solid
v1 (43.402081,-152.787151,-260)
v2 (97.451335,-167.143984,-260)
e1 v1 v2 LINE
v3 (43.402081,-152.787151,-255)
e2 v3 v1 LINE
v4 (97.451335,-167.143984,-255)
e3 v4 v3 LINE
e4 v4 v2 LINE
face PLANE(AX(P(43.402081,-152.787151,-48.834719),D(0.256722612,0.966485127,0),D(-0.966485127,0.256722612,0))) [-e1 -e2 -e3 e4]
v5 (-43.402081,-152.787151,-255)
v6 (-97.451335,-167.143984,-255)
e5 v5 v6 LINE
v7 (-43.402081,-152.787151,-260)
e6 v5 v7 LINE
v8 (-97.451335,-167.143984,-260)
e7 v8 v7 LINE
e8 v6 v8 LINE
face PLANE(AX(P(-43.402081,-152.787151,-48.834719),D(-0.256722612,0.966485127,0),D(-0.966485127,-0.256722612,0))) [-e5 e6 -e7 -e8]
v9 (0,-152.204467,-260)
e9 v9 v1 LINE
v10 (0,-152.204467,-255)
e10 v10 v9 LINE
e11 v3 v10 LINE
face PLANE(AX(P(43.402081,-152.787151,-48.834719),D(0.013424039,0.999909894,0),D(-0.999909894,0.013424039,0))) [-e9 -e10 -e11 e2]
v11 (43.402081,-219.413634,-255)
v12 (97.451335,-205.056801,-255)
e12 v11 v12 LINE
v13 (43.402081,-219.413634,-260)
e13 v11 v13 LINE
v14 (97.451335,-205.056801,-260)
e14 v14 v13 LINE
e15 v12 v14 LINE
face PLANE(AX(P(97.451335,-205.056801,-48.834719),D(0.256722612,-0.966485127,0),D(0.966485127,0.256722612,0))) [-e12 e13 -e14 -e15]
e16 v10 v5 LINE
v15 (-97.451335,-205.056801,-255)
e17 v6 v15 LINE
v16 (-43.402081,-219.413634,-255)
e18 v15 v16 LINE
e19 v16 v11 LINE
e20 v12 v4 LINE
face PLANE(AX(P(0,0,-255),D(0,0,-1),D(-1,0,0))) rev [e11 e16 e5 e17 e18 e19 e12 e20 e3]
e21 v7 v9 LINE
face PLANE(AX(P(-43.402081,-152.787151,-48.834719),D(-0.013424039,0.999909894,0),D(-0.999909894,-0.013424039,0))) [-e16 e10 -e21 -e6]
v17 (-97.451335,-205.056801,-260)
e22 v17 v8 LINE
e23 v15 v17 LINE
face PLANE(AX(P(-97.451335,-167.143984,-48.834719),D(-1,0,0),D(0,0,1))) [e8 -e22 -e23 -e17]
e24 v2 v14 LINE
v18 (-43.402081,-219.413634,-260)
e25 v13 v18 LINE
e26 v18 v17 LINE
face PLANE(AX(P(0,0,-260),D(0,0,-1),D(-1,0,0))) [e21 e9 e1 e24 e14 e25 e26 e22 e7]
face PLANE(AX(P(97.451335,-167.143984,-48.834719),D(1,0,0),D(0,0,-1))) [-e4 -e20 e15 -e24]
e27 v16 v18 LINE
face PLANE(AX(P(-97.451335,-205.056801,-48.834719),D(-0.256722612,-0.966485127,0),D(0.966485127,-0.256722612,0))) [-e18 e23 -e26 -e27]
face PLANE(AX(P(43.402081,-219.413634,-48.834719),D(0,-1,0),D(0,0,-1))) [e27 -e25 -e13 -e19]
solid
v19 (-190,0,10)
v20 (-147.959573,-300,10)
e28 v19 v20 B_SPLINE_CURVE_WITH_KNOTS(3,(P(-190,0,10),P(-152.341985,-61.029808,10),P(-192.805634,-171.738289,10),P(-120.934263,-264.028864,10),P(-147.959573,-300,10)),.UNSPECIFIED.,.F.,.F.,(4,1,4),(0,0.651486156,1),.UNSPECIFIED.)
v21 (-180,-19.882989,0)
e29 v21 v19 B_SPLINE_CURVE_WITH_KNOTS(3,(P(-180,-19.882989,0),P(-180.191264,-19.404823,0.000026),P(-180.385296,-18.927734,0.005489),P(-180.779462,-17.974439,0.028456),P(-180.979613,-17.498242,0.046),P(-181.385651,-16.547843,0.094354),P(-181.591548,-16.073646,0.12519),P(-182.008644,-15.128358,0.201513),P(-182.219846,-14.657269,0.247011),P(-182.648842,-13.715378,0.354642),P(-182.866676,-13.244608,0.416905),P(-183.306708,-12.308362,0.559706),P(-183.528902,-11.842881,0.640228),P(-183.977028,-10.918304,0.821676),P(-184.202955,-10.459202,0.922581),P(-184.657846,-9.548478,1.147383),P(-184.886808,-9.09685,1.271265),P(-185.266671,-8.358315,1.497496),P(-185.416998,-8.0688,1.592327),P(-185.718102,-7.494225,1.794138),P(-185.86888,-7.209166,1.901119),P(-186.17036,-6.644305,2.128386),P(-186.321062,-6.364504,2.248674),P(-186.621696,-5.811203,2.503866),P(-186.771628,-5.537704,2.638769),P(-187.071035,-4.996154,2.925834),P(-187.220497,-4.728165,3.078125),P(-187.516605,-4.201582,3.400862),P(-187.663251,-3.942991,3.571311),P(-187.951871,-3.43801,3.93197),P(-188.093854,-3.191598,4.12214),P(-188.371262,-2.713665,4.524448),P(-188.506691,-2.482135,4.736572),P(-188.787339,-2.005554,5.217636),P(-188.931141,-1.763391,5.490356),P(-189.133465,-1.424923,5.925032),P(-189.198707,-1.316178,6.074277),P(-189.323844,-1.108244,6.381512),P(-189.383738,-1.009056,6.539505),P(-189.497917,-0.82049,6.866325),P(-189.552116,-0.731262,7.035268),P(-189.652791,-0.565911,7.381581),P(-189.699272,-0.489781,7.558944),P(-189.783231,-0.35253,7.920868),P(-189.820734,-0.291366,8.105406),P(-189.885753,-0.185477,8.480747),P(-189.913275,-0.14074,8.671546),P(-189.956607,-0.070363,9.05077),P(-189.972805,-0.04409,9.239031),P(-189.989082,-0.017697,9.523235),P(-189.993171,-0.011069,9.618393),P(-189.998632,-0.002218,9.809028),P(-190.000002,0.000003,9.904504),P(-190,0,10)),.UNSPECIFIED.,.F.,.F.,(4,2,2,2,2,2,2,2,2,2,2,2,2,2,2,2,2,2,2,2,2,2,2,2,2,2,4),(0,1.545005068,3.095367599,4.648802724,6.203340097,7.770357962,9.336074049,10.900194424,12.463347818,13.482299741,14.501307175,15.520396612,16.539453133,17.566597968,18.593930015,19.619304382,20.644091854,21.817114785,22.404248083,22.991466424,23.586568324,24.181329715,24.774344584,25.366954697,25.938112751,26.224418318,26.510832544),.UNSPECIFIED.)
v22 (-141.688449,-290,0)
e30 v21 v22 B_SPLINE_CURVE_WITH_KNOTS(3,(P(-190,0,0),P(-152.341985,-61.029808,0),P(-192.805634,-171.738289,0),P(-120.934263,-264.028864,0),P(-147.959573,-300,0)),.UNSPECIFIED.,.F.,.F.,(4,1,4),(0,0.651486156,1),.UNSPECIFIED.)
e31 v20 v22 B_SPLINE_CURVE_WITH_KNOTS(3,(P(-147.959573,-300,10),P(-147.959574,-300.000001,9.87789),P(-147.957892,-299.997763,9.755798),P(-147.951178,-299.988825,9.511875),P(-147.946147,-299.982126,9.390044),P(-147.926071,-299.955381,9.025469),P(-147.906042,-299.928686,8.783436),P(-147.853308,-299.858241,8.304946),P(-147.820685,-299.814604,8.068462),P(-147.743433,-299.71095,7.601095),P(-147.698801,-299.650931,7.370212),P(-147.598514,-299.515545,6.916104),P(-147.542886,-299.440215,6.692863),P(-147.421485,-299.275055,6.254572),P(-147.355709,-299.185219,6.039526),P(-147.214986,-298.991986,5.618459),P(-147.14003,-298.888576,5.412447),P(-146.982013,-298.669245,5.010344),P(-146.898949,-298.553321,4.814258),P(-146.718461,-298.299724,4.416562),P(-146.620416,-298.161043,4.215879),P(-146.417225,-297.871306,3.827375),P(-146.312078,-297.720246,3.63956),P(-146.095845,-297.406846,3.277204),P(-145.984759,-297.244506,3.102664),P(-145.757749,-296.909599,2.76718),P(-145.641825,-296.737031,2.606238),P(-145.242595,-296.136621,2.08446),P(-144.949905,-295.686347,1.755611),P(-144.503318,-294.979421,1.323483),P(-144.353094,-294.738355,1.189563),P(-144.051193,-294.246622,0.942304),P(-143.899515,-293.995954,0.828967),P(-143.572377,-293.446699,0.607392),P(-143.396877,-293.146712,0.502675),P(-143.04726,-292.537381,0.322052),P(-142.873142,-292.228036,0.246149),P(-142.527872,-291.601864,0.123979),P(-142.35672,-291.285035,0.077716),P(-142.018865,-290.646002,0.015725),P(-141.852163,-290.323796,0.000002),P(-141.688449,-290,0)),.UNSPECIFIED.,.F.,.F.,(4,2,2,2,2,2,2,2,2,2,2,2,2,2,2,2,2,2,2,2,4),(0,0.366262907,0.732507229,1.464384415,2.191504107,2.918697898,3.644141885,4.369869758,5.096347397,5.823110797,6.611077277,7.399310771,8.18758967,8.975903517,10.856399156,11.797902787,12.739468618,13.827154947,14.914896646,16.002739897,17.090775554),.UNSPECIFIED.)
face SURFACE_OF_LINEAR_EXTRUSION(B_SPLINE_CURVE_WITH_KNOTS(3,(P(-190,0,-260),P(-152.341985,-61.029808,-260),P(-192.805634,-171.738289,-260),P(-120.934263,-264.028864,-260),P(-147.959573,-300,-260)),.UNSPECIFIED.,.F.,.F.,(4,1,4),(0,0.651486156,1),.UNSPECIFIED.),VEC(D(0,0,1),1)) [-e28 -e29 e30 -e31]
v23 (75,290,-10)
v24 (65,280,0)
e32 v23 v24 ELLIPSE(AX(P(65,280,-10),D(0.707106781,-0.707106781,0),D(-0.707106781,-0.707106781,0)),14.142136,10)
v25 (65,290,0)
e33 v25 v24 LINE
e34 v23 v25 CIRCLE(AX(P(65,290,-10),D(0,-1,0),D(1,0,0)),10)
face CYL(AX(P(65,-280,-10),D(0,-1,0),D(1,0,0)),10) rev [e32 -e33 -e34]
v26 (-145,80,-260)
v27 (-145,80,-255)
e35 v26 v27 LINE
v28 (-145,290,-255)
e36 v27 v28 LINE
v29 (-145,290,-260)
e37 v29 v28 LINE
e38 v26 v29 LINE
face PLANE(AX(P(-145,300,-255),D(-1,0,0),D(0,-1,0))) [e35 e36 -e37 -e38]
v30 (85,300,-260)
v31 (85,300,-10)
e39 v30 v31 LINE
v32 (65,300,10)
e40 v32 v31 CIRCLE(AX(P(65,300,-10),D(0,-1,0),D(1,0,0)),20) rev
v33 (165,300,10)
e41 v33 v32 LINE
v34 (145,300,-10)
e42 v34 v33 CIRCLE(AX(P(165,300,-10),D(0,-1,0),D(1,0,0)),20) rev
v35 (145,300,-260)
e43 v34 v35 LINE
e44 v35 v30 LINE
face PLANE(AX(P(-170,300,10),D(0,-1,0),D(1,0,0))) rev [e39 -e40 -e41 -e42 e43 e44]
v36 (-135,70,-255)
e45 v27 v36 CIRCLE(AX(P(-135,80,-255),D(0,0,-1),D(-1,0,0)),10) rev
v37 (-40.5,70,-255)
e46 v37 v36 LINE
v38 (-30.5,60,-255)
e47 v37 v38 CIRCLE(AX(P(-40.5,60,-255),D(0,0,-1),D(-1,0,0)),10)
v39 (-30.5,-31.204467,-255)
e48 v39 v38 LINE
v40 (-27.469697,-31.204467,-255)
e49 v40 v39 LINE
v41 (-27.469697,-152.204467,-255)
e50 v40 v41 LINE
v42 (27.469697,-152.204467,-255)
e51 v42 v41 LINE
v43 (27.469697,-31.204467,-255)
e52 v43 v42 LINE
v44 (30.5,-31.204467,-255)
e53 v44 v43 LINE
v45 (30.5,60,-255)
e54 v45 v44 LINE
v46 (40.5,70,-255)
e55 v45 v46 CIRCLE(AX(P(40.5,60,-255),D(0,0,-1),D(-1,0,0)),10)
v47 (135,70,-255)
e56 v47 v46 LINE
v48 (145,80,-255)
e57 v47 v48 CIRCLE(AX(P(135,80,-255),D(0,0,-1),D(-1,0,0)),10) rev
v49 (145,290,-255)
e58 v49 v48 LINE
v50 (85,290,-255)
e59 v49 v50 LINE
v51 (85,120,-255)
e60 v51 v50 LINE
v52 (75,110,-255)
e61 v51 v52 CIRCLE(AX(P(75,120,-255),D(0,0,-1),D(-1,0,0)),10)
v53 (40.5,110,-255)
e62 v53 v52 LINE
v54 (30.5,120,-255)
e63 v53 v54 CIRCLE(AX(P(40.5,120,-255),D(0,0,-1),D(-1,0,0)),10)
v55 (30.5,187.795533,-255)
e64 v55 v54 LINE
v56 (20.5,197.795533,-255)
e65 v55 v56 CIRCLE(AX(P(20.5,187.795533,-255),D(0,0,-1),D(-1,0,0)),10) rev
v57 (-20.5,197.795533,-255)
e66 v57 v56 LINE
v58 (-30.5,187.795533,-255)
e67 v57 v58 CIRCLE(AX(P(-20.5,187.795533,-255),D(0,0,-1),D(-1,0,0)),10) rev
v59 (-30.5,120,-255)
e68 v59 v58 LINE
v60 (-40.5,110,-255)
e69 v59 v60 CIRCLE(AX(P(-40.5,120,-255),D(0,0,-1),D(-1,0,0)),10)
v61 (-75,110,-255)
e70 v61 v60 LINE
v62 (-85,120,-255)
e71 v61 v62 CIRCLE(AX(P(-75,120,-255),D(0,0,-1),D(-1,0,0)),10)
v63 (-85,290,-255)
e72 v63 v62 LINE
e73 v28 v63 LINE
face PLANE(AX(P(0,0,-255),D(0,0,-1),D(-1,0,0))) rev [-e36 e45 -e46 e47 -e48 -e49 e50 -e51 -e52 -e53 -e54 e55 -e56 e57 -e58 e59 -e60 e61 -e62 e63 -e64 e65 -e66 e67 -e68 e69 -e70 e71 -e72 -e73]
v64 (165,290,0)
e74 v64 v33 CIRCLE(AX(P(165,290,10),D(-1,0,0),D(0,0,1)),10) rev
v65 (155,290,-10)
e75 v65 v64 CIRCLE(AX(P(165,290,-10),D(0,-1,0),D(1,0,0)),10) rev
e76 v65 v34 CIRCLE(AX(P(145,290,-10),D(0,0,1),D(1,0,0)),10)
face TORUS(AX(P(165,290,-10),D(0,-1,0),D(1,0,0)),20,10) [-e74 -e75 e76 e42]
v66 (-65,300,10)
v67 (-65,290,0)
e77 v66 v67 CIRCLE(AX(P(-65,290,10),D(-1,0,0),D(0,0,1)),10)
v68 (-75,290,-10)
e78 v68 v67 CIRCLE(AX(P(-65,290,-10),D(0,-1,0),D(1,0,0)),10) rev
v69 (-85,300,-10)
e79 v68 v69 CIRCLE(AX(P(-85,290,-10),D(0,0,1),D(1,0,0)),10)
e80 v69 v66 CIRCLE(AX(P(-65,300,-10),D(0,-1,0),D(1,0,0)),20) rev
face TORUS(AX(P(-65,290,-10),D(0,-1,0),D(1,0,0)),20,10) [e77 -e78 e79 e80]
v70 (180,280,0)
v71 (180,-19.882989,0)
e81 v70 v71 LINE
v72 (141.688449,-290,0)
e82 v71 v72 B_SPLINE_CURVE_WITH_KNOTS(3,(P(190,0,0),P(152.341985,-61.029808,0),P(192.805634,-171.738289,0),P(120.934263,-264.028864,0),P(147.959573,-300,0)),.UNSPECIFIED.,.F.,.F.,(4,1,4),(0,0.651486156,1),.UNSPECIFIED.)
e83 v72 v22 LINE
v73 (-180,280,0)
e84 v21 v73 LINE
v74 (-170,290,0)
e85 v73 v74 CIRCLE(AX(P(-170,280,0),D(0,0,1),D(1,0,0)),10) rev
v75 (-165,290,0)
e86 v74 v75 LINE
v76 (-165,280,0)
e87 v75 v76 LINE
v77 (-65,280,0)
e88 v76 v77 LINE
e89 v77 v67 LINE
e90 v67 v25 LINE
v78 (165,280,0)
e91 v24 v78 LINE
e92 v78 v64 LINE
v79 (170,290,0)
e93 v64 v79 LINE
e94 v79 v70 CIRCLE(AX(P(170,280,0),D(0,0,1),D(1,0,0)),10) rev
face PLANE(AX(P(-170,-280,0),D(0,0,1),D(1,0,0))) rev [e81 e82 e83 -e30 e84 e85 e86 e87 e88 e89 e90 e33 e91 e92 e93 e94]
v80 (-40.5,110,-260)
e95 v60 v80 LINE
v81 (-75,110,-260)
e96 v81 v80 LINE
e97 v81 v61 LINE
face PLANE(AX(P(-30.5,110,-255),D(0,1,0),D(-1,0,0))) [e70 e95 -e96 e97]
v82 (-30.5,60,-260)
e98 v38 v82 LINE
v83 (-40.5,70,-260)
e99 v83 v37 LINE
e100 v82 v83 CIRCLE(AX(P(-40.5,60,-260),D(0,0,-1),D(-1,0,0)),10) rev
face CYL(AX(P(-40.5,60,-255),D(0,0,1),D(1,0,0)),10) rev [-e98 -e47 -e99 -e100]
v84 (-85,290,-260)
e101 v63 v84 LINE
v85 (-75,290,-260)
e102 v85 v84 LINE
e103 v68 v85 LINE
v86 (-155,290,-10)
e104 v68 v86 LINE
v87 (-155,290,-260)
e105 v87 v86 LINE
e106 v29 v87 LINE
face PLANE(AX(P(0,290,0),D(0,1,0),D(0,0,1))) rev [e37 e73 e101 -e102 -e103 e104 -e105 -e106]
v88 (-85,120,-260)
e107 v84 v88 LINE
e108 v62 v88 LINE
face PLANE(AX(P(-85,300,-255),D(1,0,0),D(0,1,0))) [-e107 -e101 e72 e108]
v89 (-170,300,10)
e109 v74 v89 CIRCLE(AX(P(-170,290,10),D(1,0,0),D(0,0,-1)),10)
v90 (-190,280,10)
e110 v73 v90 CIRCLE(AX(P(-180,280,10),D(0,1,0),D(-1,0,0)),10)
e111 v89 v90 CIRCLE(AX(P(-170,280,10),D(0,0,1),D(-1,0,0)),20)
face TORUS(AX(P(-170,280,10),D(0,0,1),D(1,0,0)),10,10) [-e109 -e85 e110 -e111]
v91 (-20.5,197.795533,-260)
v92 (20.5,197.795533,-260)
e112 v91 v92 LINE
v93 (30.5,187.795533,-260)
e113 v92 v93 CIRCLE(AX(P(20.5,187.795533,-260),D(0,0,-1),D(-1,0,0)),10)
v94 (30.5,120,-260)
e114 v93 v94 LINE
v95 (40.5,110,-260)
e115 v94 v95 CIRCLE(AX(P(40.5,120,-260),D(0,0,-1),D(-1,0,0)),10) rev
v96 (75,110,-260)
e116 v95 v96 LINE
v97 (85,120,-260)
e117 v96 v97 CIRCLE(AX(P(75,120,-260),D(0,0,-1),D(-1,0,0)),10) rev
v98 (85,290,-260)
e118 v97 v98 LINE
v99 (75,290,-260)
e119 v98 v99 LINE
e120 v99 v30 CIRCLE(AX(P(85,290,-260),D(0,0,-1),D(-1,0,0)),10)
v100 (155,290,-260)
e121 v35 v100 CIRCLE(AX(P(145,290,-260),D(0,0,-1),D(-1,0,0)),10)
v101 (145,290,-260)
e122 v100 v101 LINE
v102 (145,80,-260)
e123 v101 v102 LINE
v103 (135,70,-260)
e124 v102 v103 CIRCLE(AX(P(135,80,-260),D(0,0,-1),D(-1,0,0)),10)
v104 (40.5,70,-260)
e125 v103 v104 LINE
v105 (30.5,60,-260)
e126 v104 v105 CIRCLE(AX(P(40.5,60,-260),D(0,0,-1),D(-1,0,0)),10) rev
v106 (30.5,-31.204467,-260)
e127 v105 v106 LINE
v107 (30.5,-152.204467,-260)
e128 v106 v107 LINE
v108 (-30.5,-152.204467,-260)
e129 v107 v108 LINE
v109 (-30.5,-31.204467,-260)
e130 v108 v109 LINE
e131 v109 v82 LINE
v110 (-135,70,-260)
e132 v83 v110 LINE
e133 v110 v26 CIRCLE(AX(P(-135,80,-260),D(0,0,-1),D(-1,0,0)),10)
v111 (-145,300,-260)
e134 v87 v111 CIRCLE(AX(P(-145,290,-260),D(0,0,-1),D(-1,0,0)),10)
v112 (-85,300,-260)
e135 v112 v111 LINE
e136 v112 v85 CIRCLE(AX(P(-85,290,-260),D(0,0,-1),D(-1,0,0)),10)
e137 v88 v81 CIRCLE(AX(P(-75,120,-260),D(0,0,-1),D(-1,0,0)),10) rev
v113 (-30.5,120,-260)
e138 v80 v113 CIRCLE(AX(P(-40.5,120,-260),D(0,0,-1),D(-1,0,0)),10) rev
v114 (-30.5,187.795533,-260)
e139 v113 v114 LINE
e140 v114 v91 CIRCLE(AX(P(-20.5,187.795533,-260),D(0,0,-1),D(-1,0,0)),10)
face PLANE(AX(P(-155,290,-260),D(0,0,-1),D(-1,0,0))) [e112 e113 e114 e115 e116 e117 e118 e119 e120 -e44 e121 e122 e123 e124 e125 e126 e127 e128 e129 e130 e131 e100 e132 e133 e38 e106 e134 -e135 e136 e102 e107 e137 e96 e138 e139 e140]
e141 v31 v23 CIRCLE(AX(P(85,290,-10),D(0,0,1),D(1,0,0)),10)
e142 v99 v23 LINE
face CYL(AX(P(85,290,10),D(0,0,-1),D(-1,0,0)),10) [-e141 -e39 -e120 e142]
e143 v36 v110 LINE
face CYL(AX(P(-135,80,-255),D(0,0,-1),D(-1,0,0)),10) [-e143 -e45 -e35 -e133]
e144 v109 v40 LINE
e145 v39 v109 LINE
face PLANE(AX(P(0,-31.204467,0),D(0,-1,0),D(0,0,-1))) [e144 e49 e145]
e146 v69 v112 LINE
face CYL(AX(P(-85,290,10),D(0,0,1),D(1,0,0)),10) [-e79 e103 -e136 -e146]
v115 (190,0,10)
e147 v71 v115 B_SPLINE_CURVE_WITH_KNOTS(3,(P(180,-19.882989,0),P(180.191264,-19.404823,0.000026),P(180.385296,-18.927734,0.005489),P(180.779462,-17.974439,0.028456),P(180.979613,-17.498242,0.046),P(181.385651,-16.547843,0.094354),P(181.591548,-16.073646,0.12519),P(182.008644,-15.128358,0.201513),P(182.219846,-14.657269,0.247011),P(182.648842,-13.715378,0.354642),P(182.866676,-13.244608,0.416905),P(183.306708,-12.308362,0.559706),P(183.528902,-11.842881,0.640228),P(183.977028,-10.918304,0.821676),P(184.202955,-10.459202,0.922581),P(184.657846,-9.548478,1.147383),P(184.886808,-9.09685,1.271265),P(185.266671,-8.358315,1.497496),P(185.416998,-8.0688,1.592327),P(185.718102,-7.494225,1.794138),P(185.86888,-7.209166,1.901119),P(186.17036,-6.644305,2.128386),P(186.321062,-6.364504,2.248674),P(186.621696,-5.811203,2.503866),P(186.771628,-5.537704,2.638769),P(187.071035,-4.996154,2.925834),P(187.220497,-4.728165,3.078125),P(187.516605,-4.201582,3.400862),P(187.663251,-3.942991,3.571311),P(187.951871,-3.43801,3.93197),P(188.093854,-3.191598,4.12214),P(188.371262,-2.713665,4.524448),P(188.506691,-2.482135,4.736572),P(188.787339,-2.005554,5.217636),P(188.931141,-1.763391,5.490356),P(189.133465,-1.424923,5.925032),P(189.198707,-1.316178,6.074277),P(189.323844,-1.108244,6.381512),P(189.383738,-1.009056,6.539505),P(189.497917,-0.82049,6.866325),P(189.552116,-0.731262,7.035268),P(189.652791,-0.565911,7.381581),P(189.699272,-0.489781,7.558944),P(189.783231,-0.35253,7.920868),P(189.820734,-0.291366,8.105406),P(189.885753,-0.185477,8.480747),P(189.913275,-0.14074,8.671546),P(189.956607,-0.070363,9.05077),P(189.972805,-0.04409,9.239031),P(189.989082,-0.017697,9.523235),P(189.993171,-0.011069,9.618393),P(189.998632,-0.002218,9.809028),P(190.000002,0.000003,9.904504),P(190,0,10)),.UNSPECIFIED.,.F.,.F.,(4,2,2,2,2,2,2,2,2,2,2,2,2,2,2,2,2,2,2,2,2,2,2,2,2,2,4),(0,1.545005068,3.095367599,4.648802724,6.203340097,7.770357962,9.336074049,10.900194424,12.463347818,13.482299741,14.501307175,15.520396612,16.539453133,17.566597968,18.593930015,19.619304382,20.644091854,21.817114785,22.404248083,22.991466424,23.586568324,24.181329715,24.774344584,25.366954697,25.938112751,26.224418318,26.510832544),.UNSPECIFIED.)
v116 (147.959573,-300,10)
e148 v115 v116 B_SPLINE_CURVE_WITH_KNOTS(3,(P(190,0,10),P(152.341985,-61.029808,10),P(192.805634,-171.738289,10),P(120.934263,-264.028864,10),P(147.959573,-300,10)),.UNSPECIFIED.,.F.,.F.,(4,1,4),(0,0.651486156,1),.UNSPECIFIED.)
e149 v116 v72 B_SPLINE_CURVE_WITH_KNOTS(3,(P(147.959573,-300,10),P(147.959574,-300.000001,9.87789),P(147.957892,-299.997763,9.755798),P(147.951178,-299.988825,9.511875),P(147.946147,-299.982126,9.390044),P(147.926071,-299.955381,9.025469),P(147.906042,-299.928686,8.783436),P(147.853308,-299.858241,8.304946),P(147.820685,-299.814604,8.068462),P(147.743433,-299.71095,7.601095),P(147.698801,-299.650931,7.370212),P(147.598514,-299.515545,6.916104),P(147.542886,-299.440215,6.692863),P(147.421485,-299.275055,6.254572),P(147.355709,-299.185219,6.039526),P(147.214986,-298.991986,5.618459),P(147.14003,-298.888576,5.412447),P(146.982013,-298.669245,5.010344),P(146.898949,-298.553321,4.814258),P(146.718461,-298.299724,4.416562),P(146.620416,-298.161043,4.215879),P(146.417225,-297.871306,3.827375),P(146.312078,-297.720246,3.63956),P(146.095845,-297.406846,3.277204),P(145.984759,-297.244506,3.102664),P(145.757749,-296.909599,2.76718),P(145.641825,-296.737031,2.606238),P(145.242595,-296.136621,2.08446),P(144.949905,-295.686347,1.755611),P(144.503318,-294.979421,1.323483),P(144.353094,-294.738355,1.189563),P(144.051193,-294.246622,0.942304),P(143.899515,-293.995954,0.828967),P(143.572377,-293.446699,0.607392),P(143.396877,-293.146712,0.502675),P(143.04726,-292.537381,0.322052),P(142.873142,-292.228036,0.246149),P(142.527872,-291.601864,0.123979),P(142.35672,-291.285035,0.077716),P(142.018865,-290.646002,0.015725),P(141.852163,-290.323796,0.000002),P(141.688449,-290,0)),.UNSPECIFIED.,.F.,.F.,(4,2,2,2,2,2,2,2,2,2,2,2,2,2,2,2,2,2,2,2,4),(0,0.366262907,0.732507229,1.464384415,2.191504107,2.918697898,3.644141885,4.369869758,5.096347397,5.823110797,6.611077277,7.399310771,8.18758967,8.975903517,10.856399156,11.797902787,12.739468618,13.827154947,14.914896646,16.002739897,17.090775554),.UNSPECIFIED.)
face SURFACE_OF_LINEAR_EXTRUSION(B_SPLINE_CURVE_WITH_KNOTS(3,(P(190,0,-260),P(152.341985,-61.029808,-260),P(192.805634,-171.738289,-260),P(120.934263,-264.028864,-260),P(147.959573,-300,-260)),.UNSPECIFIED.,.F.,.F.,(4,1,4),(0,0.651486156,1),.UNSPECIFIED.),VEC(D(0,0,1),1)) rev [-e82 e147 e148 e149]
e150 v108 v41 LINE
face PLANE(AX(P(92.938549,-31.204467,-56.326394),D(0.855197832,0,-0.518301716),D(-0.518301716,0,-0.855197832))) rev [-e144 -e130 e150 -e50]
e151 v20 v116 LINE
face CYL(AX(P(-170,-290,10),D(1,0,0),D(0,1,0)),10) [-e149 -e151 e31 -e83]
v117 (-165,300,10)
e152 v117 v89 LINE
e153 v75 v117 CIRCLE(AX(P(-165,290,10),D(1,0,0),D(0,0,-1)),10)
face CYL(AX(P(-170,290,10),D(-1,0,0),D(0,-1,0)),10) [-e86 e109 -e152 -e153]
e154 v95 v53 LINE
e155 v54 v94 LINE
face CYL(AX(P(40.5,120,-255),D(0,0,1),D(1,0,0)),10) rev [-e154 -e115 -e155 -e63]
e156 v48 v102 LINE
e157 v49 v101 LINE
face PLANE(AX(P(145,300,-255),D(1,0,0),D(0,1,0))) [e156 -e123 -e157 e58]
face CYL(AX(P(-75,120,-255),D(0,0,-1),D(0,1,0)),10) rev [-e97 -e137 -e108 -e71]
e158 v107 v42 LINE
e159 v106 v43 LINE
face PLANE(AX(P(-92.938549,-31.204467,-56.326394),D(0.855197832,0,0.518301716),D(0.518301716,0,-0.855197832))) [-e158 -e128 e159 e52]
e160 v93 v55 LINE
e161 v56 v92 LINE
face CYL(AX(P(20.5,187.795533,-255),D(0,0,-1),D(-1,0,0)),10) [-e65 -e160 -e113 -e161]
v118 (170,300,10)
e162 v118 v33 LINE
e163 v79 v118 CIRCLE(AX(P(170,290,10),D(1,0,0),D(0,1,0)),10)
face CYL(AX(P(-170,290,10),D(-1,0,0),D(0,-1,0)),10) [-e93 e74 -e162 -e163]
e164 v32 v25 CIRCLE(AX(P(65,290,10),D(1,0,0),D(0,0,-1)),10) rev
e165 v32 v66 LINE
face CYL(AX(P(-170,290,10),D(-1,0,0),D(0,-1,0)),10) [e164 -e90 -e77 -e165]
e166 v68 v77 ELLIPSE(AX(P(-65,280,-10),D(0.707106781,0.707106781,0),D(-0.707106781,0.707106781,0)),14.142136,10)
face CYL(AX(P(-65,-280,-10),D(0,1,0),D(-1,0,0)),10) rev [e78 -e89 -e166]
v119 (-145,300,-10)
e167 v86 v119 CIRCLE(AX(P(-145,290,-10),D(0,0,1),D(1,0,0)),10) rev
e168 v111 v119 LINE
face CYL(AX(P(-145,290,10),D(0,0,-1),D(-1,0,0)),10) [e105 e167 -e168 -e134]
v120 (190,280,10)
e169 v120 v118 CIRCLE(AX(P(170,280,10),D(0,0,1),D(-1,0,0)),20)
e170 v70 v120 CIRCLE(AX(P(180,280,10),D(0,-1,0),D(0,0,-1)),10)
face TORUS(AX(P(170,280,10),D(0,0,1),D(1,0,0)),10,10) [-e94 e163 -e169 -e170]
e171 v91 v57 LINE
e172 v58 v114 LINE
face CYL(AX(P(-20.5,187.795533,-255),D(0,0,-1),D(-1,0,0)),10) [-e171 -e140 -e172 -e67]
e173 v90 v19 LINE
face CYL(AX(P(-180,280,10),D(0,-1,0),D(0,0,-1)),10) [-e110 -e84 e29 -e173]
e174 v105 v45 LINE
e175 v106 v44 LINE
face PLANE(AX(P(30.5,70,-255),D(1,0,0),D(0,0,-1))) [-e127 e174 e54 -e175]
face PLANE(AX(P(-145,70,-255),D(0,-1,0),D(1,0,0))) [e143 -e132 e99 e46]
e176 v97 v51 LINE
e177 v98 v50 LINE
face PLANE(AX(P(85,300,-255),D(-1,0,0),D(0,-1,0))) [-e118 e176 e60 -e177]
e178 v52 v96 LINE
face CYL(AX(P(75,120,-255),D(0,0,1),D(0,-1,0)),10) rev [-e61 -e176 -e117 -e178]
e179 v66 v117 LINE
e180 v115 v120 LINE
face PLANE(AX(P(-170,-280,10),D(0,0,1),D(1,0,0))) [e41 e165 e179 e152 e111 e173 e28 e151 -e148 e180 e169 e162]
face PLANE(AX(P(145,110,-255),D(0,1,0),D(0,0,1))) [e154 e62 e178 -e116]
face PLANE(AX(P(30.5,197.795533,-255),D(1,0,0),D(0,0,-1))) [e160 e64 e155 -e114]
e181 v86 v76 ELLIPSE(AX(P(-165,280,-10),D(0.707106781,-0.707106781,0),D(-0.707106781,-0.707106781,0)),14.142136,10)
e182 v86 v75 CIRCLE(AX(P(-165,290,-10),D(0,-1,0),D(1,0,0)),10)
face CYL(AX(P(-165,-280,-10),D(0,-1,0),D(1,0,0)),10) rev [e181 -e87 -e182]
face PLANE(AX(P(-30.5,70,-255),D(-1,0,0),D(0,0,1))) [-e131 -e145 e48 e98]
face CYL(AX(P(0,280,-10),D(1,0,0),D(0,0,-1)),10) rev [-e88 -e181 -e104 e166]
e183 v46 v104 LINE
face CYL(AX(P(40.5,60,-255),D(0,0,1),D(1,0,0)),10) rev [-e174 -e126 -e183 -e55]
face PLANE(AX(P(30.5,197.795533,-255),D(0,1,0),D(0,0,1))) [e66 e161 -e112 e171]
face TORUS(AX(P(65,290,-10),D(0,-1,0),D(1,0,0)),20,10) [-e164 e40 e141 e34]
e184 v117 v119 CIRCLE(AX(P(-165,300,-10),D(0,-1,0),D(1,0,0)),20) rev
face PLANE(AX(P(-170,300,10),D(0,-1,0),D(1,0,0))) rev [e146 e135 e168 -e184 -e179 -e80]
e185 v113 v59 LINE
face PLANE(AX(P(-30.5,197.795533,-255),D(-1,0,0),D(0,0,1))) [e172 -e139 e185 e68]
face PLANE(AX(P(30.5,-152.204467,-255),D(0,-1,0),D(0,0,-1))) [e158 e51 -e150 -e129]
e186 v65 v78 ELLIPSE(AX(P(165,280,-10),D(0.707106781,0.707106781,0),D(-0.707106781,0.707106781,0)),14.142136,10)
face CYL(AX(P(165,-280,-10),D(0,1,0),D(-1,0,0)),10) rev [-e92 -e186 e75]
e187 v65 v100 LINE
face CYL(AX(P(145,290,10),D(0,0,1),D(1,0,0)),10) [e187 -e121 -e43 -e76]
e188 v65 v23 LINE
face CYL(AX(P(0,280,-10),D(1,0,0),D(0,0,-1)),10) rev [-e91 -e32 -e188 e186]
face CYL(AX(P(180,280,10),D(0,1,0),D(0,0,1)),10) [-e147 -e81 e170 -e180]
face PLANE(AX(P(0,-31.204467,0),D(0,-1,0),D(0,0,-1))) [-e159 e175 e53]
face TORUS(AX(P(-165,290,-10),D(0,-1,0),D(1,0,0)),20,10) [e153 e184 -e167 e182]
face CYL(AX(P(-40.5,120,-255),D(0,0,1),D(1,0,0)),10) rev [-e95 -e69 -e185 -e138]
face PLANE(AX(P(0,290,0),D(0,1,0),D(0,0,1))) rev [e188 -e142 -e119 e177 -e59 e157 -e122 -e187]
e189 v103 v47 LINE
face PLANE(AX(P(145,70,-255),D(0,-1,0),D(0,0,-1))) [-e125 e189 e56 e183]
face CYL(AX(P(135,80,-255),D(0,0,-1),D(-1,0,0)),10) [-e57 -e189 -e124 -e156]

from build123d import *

# Parameters (mm, degrees)
BOSS_EXTRU_1_DEPTH      = 10
ESQUISSE2_W             = 80
ESQUISSE2_H             = 270
BOSS_EXTRU_2_DEPTH      = 10
CONG_1_R                = 10
ENL_V_MAT_EXTRU_1_DEPTH = 447.094160464
ESQUISSE5_W             = 60
ESQUISSE5_H             = 230
BOSS_EXTRU_3_DEPTH      = 5
BOSS_EXTRU_4_DEPTH      = 5
CONG_2_R                = 10
ENL_V_MAT_EXTRU_4_DEPTH = 121
BOSS_EXTRU_5_DEPTH      = 5


with BuildPart() as part:
    # Esquisse1 → Boss.-Extru.1 (new body)
    with BuildSketch(Plane.XY):
        with BuildLine():
            Line((-170, 300), (170, 300))
            ThreePointArc((170, 300), (184.142135624, 294.142135624), (190, 280))
            Line((190, 280), (190, -280))
            ThreePointArc((190, -280), (184.142135624, -294.142135624), (170, -300))
            Line((170, -300), (-170, -300))
            ThreePointArc((-170, -300), (-184.142135624, -294.142135624), (-190, -280))
            Line((-190, -280), (-190, 280))
            ThreePointArc((-190, 280), (-184.142135624, 294.142135624), (-170, 300))
        make_face()
    extrude(amount=BOSS_EXTRU_1_DEPTH)

    # Esquisse2 → Boss.-Extru.2 (add)
    with BuildSketch(Plane(origin=(0, 300, 0), x_dir=(1, 0, 0), z_dir=(0, 1, 0))):
        with Locations((-115, 125)):
            Rectangle(ESQUISSE2_W, ESQUISSE2_H)
        with Locations((115, 125)):
            Rectangle(ESQUISSE2_W, ESQUISSE2_H)
    extrude(amount=-BOSS_EXTRU_2_DEPTH)

    # Congé1
    cong_1_edges = [part.edges().sort_by_distance(p)[0] for p in [
        (-155, 300, -130),
        (-162.5, 300, 0),
        (-184.142135624, 294.142135624, 0),
        (-190, 0, 0),
        (-184.142135624, -294.142135624, 0),
        (0, -300, 0),
        (184.142135624, -294.142135624, 0),
        (190, 0, 0),
        (-75, 300, -130),
        (184.142135624, 294.142135624, 0),
        (0, 300, 0),
        (162.5, 300, 0),
        (75, 300, -130),
        (155, 300, -130),
        (115, 290, 0),
        (-115, 290, 0),
        (-155, 295, 0),
        (155, 295, 0),
        (-75, 295, 0),
        (75, 295, 0),
    ]]
    fillet(cong_1_edges, radius=CONG_1_R - 0.0001)  # a hair under: the kernel refuses the full size

    # Esquisse4 → Enlèv. mat.-Extru.1 (cut, through all)
    with BuildSketch(Plane.XY.offset(10)):
        with BuildLine():
            add(Edge.make_bspline(
                [(-190, 0), (-152.341984932, -61.029808148), (-192.805633878, -171.738289178), (-120.934262628, -264.028864274), (-147.959572806, -300)],
                knots=[0, 0, 0, 0, 0.651486156, 1, 1, 1, 1], degree=3))
            Line((-190, 0), (-190, -280))
            ThreePointArc((-190, -280), (-184.142135624, -294.142135624), (-170, -300))
            Line((-170, -300), (-147.959572806, -300))
        make_face()
        with BuildLine():
            add(Edge.make_bspline(
                [(190, 0), (152.341984932, -61.029808148), (192.805633878, -171.738289178), (120.934262628, -264.028864274), (147.959572806, -300)],
                knots=[0, 0, 0, 0, 0.651486156, 1, 1, 1, 1], degree=3))
            Line((147.959572806, -300), (170, -300))
            ThreePointArc((170, -300), (184.142135624, -294.142135624), (190, -280))
            Line((190, -280), (190, 0))
        make_face()
    extrude(amount=-ENL_V_MAT_EXTRU_1_DEPTH, mode=Mode.SUBTRACT)

    # Esquisse5 → Boss.-Extru.3 (add)
    with BuildSketch(Plane(origin=(0, 0, -260), x_dir=(-1, 0, 0), z_dir=(0, 0, -1))):
        with Locations((-115, 185)):
            Rectangle(ESQUISSE5_W, ESQUISSE5_H)
        with Locations((115, 185)):
            Rectangle(ESQUISSE5_W, ESQUISSE5_H)
    extrude(amount=-BOSS_EXTRU_3_DEPTH)

    # Esquisse6 → Boss.-Extru.4 (add)
    with BuildSketch(Plane(origin=(0, 0, -260), x_dir=(-1, 0, 0), z_dir=(0, 0, -1))):
        Polygon((-145, 110), (-30.5, 110), (-30.5, 197.79553311), (30.5, 197.79553311), (30.5, 110), (145, 110), (145, 70), (30.5, 70), (30.5, -152.20446689), (-30.5, -152.20446689), (-30.5, 70), (-145, 70), align=None)
    extrude(amount=-BOSS_EXTRU_4_DEPTH)

    # Congé2
    cong_2_edges = [part.edges().sort_by_distance(p)[0] for p in [
        (145, 70, -257.5),
        (-145, 70, -257.5),
        (85, 110, -257.5),
        (30.5, 110, -257.5),
        (30.5, 197.79553311, -257.5),
        (-30.5, 197.79553311, -257.5),
        (-85, 110, -257.5),
        (-30.5, 110, -257.5),
        (-30.5, 70, -257.5),
        (30.5, 70, -257.5),
    ]]
    fillet(cong_2_edges, radius=CONG_2_R)

    # Esquisse8 → Enlèv. mat.-Extru.4 (cut)
    with BuildSketch(Plane.XZ.offset(152.20446689)):
        Polygon((-27.46969697, -255), (-30.5, -255), (-30.5, -260), align=None)
        Polygon((30.5, -255), (27.46969697, -255), (30.5, -260), align=None)
    extrude(amount=-ENL_V_MAT_EXTRU_4_DEPTH, mode=Mode.SUBTRACT)


with BuildPart() as body_2:
    # Esquisse9 → Boss.-Extru.5 (new body)
    with BuildSketch(Plane(origin=(0, 0, -260), x_dir=(-1, 0, 0), z_dir=(0, 0, -1))):
        Polygon((-43.402081378, -152.787150642), (0, -152.20446689), (43.402081378, -152.787150642), (97.45133517, -167.14398368), (97.45133517, -205.056801371), (43.402081378, -219.413634409), (-43.402081378, -219.413634409), (-97.45133517, -205.056801371), (-97.45133517, -167.14398368), align=None)
    extrude(amount=-BOSS_EXTRU_5_DEPTH)


solid = Compound([part.part, body_2.part])
